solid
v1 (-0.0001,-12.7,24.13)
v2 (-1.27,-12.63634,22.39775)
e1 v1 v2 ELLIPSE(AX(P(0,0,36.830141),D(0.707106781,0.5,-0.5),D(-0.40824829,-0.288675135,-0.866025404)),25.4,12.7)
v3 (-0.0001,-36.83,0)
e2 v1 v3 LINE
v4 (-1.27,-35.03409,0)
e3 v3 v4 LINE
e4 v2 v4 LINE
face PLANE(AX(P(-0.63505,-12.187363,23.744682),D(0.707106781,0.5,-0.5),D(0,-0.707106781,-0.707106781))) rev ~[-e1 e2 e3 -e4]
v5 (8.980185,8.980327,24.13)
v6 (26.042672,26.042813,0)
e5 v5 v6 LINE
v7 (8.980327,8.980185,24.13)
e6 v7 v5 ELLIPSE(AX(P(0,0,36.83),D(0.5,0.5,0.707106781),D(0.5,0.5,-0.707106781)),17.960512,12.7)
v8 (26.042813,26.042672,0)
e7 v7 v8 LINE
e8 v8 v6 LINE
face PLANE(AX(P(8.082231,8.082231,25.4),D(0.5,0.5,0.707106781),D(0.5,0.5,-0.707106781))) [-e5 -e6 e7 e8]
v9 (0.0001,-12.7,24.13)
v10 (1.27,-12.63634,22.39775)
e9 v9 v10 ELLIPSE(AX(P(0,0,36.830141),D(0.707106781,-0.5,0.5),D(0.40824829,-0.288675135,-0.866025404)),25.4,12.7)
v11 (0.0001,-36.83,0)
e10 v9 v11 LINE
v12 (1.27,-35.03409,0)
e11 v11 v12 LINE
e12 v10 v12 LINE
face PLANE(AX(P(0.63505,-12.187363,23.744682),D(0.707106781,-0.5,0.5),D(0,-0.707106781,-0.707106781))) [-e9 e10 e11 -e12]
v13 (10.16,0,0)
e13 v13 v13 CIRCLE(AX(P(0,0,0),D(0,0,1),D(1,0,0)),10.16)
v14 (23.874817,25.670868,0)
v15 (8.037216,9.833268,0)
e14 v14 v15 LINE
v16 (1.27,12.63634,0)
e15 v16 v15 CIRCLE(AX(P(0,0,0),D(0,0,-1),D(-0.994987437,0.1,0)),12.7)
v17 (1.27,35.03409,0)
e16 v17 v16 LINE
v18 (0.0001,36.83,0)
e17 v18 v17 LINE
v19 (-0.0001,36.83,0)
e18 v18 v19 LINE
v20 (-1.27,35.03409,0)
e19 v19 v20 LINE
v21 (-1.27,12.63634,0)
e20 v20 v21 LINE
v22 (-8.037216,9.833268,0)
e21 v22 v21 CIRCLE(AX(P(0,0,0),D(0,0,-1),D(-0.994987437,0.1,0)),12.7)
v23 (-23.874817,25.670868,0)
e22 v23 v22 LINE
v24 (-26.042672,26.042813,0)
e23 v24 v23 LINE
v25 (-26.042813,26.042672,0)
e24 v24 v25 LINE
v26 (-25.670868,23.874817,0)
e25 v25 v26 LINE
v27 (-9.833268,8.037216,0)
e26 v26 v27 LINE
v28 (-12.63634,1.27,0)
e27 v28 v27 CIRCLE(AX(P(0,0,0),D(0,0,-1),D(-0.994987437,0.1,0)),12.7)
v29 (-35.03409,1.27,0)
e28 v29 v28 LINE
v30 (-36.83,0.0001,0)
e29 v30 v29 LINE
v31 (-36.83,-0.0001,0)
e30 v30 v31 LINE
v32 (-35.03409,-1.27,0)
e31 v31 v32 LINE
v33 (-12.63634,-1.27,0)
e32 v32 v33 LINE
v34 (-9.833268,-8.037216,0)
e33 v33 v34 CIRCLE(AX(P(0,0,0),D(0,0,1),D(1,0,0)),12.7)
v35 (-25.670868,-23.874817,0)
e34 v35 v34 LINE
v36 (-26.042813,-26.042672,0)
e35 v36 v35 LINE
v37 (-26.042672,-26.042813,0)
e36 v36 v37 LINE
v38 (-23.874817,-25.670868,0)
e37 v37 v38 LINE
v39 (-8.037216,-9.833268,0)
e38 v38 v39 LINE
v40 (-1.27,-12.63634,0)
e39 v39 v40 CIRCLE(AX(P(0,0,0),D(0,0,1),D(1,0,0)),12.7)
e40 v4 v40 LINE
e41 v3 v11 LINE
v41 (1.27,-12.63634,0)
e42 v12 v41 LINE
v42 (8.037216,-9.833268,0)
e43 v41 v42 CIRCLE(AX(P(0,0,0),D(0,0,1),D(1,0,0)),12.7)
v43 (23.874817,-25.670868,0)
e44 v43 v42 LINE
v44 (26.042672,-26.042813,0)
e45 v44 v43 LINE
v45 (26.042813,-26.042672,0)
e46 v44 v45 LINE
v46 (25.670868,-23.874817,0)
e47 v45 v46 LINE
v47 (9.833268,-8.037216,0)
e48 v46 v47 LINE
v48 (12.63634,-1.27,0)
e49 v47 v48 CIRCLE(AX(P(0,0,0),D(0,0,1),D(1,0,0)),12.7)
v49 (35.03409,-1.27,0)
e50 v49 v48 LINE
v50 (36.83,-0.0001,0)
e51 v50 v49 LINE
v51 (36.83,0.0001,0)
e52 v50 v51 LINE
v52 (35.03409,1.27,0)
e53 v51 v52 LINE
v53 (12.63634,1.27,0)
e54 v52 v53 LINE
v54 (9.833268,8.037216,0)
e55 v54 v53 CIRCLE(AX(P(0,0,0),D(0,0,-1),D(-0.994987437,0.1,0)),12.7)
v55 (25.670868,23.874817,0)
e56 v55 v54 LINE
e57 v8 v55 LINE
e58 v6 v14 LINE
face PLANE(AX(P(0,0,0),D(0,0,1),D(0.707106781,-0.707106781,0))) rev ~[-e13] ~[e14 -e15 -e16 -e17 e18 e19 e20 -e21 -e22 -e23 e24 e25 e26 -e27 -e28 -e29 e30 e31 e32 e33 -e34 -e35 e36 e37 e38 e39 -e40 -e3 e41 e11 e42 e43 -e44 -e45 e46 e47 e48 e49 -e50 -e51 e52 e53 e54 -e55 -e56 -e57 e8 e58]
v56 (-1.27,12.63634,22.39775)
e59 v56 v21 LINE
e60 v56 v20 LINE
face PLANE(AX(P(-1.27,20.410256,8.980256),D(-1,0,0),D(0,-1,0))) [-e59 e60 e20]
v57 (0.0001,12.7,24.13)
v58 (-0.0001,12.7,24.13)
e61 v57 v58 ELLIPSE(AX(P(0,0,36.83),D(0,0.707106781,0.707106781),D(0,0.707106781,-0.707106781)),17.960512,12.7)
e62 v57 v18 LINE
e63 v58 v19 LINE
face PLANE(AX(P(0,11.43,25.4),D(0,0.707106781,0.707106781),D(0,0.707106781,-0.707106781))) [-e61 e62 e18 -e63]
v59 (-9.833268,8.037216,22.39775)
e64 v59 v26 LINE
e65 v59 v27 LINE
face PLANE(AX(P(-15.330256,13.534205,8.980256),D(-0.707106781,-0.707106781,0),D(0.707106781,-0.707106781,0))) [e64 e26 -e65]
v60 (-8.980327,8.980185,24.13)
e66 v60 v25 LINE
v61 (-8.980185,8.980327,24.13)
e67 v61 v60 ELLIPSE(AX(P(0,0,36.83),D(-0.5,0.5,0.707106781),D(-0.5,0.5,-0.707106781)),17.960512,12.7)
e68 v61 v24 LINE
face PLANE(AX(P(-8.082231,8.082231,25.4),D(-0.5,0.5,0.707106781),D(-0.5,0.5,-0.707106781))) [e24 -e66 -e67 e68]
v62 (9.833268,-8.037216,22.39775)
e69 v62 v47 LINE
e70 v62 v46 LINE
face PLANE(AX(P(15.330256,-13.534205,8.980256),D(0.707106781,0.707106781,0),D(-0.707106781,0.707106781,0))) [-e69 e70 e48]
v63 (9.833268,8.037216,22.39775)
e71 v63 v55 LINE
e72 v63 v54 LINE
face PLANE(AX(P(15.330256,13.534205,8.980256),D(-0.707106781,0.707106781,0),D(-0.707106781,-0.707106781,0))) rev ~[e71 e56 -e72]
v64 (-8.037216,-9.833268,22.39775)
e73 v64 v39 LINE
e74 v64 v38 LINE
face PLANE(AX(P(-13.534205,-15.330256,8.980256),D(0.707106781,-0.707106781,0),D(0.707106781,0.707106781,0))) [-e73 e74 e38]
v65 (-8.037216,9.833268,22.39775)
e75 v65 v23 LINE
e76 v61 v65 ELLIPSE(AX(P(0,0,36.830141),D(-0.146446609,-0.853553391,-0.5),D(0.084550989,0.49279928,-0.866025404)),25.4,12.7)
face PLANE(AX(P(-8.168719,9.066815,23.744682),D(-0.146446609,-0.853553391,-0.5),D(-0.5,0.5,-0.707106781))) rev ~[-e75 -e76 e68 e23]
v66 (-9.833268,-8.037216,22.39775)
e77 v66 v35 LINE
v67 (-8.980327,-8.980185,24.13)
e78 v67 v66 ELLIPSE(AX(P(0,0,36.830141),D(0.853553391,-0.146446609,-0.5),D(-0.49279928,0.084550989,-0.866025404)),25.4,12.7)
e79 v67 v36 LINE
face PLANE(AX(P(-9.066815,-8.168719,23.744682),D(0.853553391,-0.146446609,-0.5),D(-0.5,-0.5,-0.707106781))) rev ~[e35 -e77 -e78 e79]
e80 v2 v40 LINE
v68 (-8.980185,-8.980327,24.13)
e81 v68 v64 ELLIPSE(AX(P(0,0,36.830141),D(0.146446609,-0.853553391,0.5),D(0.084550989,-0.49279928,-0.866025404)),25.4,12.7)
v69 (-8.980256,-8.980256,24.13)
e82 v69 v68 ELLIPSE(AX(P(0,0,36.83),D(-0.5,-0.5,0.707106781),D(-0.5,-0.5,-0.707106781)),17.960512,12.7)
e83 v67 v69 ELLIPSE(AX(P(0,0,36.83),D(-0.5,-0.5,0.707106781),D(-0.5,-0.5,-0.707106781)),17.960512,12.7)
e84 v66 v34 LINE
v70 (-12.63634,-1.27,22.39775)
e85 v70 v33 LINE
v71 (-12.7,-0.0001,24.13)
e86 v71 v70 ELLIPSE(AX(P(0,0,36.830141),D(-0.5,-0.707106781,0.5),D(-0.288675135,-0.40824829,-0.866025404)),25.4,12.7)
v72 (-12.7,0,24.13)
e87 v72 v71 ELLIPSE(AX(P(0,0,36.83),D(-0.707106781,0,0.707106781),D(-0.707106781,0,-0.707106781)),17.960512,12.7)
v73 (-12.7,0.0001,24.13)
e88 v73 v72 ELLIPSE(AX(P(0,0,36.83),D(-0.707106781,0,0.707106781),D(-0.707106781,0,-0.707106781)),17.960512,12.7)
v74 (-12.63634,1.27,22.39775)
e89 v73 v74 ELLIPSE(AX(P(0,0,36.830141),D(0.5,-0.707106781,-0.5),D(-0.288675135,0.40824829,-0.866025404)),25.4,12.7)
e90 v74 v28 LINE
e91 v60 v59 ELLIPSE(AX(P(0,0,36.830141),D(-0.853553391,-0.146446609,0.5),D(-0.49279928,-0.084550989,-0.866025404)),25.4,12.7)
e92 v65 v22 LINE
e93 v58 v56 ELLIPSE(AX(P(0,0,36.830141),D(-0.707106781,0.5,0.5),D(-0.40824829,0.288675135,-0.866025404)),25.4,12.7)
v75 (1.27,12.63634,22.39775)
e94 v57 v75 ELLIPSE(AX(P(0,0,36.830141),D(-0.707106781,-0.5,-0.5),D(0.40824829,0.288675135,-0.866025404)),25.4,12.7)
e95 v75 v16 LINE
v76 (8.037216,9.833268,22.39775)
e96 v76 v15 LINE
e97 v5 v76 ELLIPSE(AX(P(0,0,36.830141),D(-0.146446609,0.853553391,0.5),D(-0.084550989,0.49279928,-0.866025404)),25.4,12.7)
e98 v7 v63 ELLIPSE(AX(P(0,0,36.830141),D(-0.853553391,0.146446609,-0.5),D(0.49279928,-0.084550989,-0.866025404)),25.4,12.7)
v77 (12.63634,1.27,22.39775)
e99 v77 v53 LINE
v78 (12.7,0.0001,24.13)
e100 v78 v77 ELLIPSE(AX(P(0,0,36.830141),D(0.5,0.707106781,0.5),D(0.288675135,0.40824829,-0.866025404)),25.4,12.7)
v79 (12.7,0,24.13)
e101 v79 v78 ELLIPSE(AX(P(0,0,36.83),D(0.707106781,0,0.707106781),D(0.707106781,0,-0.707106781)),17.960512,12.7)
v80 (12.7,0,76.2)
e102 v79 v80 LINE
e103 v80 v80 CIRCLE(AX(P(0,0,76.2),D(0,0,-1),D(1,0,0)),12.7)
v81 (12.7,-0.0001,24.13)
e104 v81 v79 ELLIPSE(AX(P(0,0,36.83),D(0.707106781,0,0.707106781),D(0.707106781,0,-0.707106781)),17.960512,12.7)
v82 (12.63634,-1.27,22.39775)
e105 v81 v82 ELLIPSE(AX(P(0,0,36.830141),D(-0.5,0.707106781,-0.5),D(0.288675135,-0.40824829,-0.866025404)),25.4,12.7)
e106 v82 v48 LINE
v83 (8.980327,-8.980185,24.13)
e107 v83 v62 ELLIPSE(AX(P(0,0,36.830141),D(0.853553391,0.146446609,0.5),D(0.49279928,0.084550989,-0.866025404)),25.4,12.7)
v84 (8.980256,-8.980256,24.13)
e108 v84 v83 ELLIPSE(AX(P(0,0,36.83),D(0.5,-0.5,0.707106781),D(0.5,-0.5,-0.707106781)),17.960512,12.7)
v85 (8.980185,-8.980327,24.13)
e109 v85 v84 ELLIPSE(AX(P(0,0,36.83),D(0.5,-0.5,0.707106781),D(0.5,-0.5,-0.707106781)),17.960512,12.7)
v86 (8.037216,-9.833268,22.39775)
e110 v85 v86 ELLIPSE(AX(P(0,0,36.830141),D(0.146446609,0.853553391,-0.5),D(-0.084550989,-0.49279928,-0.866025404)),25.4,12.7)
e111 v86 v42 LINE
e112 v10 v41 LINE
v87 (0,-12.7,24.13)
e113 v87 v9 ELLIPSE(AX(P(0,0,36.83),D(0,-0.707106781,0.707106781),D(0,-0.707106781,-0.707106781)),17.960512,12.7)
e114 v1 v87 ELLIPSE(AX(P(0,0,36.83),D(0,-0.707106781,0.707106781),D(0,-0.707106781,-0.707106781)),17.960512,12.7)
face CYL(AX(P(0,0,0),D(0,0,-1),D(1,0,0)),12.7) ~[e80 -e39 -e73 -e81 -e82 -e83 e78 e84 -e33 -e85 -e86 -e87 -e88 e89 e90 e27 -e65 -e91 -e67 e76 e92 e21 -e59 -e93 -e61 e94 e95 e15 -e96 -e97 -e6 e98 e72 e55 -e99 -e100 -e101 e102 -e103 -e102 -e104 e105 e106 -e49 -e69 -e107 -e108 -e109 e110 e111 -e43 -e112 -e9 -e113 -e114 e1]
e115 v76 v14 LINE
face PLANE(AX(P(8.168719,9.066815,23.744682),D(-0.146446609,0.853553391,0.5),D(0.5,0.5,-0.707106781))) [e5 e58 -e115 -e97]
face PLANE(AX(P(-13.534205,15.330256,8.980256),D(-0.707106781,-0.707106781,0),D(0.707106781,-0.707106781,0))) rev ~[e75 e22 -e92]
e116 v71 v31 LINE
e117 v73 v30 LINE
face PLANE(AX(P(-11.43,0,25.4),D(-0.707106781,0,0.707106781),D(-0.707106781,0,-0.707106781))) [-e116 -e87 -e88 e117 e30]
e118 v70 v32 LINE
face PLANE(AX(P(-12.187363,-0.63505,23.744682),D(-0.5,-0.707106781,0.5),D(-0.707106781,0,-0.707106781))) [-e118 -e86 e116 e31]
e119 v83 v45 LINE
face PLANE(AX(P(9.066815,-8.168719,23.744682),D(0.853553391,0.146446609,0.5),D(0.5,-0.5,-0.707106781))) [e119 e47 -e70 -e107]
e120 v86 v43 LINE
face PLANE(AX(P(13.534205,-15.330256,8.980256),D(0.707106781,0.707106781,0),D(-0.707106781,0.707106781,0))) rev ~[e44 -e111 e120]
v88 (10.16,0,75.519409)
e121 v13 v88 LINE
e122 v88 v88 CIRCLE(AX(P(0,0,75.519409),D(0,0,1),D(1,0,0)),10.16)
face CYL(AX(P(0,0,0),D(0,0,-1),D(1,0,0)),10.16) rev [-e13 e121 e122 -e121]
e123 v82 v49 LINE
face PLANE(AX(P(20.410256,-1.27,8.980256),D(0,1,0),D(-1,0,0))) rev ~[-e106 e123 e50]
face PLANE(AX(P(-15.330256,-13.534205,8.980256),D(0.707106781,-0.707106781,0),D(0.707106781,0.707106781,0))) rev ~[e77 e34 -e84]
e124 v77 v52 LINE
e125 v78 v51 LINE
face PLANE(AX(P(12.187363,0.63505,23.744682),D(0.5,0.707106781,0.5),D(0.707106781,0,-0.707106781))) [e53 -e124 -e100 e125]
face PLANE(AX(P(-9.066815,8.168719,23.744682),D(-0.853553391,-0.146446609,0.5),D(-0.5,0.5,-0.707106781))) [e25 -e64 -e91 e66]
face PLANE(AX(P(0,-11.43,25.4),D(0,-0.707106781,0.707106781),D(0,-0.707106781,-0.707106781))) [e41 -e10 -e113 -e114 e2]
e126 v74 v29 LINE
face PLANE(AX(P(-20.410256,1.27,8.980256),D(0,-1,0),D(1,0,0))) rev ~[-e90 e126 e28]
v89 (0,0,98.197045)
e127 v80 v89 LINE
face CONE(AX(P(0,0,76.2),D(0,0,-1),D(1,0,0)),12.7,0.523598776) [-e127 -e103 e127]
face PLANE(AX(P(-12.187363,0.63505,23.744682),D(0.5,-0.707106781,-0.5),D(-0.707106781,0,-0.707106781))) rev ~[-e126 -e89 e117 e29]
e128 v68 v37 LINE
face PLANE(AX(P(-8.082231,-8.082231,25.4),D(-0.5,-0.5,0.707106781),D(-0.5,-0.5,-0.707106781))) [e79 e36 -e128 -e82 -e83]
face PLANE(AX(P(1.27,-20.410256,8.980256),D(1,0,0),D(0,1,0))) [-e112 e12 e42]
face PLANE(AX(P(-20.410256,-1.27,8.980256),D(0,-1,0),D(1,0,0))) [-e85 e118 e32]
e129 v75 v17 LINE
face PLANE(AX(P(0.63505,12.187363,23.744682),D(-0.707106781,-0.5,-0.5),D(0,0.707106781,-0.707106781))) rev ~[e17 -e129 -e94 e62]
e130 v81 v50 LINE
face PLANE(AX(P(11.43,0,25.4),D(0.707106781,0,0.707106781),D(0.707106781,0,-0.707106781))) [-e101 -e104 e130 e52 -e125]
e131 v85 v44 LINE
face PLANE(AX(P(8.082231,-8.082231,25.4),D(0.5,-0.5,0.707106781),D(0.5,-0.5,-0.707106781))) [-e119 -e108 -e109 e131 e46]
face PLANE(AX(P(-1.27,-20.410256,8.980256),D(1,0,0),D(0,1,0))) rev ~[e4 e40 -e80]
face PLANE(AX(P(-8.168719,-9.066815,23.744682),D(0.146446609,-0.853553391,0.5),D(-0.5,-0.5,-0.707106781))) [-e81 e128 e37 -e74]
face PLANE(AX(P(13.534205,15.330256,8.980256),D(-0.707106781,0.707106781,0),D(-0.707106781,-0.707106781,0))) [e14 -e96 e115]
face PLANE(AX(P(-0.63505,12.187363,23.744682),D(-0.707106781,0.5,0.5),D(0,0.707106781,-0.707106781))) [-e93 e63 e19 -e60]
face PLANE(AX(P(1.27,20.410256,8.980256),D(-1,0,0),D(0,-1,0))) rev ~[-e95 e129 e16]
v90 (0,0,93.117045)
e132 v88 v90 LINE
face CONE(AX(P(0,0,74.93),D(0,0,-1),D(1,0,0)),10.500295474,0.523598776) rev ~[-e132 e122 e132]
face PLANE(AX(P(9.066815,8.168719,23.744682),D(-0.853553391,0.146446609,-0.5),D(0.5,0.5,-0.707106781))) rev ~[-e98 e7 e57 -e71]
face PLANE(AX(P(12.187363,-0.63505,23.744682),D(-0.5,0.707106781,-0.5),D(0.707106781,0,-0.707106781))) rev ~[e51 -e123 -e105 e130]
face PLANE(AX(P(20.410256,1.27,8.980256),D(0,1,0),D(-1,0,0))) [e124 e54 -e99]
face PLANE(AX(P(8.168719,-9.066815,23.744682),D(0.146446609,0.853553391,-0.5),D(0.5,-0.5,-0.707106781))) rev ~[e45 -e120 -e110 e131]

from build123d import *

# Parameters (mm, degrees)
F0_R      = 12.7
F1_DEPTH  = 76.2
F1_FACE_R = 12.7
F2_DEPTH  = 25.4
F2_TAPER  = 30
F3_T      = -2.54
F5_DEPTH  = 1.27
F6_SIZE   = 1.2699
F7_COUNT  = 8


# Not quite as in the source:
# - a fillet or chamfer is up to 0.001 mm smaller than in the source, because OpenCascade refuses the exact size


with BuildPart() as f1:
    # F0 (on Top) → F1 (new body)
    with BuildSketch(Plane.XY):
        Circle(F0_R)
    extrude(amount=F1_DEPTH)

    # F1_face (on face) → F2 (join)
    with BuildSketch(Plane.XY.offset(76.2)):
        Circle(F1_FACE_R)
    extrude(amount=F2_DEPTH, taper=F2_TAPER)

    # F3
    f3_openings = [f1.faces().sort_by_distance(p)[0] for p in [
        (0, 0, 0),
    ]]
    offset(amount=F3_T, openings=f3_openings)

    # F4 (on Front) → F5 (join, symmetric)
    with BuildSketch(Plane.XZ):
        Polygon((-11.43, 25.4), (-36.83, 0), (-11.43, 0), align=None)
    extrude(amount=F5_DEPTH, both=True)

    # F6 (size 1.27 in the source; OpenCascade refuses exactly that, so slightly less here)
    f6_edges = [f1.edges().sort_by_distance(p)[0] for p in [
        (-24.73317, -1.27, 12.09683),
        (-24.73317, 1.27, 12.09683),
    ]]
    chamfer(f6_edges, length=F6_SIZE)

    # F7: F1 ×8 about axis
    f7_axis = Axis((0, 0, 0), (0, 0, 1))


with BuildPart() as f1_1:
    add(f1.part)
    for i in range(1, F7_COUNT):
        add(f1.part.rotate(f7_axis, i * 360 / F7_COUNT))


solid = f1_1.part
